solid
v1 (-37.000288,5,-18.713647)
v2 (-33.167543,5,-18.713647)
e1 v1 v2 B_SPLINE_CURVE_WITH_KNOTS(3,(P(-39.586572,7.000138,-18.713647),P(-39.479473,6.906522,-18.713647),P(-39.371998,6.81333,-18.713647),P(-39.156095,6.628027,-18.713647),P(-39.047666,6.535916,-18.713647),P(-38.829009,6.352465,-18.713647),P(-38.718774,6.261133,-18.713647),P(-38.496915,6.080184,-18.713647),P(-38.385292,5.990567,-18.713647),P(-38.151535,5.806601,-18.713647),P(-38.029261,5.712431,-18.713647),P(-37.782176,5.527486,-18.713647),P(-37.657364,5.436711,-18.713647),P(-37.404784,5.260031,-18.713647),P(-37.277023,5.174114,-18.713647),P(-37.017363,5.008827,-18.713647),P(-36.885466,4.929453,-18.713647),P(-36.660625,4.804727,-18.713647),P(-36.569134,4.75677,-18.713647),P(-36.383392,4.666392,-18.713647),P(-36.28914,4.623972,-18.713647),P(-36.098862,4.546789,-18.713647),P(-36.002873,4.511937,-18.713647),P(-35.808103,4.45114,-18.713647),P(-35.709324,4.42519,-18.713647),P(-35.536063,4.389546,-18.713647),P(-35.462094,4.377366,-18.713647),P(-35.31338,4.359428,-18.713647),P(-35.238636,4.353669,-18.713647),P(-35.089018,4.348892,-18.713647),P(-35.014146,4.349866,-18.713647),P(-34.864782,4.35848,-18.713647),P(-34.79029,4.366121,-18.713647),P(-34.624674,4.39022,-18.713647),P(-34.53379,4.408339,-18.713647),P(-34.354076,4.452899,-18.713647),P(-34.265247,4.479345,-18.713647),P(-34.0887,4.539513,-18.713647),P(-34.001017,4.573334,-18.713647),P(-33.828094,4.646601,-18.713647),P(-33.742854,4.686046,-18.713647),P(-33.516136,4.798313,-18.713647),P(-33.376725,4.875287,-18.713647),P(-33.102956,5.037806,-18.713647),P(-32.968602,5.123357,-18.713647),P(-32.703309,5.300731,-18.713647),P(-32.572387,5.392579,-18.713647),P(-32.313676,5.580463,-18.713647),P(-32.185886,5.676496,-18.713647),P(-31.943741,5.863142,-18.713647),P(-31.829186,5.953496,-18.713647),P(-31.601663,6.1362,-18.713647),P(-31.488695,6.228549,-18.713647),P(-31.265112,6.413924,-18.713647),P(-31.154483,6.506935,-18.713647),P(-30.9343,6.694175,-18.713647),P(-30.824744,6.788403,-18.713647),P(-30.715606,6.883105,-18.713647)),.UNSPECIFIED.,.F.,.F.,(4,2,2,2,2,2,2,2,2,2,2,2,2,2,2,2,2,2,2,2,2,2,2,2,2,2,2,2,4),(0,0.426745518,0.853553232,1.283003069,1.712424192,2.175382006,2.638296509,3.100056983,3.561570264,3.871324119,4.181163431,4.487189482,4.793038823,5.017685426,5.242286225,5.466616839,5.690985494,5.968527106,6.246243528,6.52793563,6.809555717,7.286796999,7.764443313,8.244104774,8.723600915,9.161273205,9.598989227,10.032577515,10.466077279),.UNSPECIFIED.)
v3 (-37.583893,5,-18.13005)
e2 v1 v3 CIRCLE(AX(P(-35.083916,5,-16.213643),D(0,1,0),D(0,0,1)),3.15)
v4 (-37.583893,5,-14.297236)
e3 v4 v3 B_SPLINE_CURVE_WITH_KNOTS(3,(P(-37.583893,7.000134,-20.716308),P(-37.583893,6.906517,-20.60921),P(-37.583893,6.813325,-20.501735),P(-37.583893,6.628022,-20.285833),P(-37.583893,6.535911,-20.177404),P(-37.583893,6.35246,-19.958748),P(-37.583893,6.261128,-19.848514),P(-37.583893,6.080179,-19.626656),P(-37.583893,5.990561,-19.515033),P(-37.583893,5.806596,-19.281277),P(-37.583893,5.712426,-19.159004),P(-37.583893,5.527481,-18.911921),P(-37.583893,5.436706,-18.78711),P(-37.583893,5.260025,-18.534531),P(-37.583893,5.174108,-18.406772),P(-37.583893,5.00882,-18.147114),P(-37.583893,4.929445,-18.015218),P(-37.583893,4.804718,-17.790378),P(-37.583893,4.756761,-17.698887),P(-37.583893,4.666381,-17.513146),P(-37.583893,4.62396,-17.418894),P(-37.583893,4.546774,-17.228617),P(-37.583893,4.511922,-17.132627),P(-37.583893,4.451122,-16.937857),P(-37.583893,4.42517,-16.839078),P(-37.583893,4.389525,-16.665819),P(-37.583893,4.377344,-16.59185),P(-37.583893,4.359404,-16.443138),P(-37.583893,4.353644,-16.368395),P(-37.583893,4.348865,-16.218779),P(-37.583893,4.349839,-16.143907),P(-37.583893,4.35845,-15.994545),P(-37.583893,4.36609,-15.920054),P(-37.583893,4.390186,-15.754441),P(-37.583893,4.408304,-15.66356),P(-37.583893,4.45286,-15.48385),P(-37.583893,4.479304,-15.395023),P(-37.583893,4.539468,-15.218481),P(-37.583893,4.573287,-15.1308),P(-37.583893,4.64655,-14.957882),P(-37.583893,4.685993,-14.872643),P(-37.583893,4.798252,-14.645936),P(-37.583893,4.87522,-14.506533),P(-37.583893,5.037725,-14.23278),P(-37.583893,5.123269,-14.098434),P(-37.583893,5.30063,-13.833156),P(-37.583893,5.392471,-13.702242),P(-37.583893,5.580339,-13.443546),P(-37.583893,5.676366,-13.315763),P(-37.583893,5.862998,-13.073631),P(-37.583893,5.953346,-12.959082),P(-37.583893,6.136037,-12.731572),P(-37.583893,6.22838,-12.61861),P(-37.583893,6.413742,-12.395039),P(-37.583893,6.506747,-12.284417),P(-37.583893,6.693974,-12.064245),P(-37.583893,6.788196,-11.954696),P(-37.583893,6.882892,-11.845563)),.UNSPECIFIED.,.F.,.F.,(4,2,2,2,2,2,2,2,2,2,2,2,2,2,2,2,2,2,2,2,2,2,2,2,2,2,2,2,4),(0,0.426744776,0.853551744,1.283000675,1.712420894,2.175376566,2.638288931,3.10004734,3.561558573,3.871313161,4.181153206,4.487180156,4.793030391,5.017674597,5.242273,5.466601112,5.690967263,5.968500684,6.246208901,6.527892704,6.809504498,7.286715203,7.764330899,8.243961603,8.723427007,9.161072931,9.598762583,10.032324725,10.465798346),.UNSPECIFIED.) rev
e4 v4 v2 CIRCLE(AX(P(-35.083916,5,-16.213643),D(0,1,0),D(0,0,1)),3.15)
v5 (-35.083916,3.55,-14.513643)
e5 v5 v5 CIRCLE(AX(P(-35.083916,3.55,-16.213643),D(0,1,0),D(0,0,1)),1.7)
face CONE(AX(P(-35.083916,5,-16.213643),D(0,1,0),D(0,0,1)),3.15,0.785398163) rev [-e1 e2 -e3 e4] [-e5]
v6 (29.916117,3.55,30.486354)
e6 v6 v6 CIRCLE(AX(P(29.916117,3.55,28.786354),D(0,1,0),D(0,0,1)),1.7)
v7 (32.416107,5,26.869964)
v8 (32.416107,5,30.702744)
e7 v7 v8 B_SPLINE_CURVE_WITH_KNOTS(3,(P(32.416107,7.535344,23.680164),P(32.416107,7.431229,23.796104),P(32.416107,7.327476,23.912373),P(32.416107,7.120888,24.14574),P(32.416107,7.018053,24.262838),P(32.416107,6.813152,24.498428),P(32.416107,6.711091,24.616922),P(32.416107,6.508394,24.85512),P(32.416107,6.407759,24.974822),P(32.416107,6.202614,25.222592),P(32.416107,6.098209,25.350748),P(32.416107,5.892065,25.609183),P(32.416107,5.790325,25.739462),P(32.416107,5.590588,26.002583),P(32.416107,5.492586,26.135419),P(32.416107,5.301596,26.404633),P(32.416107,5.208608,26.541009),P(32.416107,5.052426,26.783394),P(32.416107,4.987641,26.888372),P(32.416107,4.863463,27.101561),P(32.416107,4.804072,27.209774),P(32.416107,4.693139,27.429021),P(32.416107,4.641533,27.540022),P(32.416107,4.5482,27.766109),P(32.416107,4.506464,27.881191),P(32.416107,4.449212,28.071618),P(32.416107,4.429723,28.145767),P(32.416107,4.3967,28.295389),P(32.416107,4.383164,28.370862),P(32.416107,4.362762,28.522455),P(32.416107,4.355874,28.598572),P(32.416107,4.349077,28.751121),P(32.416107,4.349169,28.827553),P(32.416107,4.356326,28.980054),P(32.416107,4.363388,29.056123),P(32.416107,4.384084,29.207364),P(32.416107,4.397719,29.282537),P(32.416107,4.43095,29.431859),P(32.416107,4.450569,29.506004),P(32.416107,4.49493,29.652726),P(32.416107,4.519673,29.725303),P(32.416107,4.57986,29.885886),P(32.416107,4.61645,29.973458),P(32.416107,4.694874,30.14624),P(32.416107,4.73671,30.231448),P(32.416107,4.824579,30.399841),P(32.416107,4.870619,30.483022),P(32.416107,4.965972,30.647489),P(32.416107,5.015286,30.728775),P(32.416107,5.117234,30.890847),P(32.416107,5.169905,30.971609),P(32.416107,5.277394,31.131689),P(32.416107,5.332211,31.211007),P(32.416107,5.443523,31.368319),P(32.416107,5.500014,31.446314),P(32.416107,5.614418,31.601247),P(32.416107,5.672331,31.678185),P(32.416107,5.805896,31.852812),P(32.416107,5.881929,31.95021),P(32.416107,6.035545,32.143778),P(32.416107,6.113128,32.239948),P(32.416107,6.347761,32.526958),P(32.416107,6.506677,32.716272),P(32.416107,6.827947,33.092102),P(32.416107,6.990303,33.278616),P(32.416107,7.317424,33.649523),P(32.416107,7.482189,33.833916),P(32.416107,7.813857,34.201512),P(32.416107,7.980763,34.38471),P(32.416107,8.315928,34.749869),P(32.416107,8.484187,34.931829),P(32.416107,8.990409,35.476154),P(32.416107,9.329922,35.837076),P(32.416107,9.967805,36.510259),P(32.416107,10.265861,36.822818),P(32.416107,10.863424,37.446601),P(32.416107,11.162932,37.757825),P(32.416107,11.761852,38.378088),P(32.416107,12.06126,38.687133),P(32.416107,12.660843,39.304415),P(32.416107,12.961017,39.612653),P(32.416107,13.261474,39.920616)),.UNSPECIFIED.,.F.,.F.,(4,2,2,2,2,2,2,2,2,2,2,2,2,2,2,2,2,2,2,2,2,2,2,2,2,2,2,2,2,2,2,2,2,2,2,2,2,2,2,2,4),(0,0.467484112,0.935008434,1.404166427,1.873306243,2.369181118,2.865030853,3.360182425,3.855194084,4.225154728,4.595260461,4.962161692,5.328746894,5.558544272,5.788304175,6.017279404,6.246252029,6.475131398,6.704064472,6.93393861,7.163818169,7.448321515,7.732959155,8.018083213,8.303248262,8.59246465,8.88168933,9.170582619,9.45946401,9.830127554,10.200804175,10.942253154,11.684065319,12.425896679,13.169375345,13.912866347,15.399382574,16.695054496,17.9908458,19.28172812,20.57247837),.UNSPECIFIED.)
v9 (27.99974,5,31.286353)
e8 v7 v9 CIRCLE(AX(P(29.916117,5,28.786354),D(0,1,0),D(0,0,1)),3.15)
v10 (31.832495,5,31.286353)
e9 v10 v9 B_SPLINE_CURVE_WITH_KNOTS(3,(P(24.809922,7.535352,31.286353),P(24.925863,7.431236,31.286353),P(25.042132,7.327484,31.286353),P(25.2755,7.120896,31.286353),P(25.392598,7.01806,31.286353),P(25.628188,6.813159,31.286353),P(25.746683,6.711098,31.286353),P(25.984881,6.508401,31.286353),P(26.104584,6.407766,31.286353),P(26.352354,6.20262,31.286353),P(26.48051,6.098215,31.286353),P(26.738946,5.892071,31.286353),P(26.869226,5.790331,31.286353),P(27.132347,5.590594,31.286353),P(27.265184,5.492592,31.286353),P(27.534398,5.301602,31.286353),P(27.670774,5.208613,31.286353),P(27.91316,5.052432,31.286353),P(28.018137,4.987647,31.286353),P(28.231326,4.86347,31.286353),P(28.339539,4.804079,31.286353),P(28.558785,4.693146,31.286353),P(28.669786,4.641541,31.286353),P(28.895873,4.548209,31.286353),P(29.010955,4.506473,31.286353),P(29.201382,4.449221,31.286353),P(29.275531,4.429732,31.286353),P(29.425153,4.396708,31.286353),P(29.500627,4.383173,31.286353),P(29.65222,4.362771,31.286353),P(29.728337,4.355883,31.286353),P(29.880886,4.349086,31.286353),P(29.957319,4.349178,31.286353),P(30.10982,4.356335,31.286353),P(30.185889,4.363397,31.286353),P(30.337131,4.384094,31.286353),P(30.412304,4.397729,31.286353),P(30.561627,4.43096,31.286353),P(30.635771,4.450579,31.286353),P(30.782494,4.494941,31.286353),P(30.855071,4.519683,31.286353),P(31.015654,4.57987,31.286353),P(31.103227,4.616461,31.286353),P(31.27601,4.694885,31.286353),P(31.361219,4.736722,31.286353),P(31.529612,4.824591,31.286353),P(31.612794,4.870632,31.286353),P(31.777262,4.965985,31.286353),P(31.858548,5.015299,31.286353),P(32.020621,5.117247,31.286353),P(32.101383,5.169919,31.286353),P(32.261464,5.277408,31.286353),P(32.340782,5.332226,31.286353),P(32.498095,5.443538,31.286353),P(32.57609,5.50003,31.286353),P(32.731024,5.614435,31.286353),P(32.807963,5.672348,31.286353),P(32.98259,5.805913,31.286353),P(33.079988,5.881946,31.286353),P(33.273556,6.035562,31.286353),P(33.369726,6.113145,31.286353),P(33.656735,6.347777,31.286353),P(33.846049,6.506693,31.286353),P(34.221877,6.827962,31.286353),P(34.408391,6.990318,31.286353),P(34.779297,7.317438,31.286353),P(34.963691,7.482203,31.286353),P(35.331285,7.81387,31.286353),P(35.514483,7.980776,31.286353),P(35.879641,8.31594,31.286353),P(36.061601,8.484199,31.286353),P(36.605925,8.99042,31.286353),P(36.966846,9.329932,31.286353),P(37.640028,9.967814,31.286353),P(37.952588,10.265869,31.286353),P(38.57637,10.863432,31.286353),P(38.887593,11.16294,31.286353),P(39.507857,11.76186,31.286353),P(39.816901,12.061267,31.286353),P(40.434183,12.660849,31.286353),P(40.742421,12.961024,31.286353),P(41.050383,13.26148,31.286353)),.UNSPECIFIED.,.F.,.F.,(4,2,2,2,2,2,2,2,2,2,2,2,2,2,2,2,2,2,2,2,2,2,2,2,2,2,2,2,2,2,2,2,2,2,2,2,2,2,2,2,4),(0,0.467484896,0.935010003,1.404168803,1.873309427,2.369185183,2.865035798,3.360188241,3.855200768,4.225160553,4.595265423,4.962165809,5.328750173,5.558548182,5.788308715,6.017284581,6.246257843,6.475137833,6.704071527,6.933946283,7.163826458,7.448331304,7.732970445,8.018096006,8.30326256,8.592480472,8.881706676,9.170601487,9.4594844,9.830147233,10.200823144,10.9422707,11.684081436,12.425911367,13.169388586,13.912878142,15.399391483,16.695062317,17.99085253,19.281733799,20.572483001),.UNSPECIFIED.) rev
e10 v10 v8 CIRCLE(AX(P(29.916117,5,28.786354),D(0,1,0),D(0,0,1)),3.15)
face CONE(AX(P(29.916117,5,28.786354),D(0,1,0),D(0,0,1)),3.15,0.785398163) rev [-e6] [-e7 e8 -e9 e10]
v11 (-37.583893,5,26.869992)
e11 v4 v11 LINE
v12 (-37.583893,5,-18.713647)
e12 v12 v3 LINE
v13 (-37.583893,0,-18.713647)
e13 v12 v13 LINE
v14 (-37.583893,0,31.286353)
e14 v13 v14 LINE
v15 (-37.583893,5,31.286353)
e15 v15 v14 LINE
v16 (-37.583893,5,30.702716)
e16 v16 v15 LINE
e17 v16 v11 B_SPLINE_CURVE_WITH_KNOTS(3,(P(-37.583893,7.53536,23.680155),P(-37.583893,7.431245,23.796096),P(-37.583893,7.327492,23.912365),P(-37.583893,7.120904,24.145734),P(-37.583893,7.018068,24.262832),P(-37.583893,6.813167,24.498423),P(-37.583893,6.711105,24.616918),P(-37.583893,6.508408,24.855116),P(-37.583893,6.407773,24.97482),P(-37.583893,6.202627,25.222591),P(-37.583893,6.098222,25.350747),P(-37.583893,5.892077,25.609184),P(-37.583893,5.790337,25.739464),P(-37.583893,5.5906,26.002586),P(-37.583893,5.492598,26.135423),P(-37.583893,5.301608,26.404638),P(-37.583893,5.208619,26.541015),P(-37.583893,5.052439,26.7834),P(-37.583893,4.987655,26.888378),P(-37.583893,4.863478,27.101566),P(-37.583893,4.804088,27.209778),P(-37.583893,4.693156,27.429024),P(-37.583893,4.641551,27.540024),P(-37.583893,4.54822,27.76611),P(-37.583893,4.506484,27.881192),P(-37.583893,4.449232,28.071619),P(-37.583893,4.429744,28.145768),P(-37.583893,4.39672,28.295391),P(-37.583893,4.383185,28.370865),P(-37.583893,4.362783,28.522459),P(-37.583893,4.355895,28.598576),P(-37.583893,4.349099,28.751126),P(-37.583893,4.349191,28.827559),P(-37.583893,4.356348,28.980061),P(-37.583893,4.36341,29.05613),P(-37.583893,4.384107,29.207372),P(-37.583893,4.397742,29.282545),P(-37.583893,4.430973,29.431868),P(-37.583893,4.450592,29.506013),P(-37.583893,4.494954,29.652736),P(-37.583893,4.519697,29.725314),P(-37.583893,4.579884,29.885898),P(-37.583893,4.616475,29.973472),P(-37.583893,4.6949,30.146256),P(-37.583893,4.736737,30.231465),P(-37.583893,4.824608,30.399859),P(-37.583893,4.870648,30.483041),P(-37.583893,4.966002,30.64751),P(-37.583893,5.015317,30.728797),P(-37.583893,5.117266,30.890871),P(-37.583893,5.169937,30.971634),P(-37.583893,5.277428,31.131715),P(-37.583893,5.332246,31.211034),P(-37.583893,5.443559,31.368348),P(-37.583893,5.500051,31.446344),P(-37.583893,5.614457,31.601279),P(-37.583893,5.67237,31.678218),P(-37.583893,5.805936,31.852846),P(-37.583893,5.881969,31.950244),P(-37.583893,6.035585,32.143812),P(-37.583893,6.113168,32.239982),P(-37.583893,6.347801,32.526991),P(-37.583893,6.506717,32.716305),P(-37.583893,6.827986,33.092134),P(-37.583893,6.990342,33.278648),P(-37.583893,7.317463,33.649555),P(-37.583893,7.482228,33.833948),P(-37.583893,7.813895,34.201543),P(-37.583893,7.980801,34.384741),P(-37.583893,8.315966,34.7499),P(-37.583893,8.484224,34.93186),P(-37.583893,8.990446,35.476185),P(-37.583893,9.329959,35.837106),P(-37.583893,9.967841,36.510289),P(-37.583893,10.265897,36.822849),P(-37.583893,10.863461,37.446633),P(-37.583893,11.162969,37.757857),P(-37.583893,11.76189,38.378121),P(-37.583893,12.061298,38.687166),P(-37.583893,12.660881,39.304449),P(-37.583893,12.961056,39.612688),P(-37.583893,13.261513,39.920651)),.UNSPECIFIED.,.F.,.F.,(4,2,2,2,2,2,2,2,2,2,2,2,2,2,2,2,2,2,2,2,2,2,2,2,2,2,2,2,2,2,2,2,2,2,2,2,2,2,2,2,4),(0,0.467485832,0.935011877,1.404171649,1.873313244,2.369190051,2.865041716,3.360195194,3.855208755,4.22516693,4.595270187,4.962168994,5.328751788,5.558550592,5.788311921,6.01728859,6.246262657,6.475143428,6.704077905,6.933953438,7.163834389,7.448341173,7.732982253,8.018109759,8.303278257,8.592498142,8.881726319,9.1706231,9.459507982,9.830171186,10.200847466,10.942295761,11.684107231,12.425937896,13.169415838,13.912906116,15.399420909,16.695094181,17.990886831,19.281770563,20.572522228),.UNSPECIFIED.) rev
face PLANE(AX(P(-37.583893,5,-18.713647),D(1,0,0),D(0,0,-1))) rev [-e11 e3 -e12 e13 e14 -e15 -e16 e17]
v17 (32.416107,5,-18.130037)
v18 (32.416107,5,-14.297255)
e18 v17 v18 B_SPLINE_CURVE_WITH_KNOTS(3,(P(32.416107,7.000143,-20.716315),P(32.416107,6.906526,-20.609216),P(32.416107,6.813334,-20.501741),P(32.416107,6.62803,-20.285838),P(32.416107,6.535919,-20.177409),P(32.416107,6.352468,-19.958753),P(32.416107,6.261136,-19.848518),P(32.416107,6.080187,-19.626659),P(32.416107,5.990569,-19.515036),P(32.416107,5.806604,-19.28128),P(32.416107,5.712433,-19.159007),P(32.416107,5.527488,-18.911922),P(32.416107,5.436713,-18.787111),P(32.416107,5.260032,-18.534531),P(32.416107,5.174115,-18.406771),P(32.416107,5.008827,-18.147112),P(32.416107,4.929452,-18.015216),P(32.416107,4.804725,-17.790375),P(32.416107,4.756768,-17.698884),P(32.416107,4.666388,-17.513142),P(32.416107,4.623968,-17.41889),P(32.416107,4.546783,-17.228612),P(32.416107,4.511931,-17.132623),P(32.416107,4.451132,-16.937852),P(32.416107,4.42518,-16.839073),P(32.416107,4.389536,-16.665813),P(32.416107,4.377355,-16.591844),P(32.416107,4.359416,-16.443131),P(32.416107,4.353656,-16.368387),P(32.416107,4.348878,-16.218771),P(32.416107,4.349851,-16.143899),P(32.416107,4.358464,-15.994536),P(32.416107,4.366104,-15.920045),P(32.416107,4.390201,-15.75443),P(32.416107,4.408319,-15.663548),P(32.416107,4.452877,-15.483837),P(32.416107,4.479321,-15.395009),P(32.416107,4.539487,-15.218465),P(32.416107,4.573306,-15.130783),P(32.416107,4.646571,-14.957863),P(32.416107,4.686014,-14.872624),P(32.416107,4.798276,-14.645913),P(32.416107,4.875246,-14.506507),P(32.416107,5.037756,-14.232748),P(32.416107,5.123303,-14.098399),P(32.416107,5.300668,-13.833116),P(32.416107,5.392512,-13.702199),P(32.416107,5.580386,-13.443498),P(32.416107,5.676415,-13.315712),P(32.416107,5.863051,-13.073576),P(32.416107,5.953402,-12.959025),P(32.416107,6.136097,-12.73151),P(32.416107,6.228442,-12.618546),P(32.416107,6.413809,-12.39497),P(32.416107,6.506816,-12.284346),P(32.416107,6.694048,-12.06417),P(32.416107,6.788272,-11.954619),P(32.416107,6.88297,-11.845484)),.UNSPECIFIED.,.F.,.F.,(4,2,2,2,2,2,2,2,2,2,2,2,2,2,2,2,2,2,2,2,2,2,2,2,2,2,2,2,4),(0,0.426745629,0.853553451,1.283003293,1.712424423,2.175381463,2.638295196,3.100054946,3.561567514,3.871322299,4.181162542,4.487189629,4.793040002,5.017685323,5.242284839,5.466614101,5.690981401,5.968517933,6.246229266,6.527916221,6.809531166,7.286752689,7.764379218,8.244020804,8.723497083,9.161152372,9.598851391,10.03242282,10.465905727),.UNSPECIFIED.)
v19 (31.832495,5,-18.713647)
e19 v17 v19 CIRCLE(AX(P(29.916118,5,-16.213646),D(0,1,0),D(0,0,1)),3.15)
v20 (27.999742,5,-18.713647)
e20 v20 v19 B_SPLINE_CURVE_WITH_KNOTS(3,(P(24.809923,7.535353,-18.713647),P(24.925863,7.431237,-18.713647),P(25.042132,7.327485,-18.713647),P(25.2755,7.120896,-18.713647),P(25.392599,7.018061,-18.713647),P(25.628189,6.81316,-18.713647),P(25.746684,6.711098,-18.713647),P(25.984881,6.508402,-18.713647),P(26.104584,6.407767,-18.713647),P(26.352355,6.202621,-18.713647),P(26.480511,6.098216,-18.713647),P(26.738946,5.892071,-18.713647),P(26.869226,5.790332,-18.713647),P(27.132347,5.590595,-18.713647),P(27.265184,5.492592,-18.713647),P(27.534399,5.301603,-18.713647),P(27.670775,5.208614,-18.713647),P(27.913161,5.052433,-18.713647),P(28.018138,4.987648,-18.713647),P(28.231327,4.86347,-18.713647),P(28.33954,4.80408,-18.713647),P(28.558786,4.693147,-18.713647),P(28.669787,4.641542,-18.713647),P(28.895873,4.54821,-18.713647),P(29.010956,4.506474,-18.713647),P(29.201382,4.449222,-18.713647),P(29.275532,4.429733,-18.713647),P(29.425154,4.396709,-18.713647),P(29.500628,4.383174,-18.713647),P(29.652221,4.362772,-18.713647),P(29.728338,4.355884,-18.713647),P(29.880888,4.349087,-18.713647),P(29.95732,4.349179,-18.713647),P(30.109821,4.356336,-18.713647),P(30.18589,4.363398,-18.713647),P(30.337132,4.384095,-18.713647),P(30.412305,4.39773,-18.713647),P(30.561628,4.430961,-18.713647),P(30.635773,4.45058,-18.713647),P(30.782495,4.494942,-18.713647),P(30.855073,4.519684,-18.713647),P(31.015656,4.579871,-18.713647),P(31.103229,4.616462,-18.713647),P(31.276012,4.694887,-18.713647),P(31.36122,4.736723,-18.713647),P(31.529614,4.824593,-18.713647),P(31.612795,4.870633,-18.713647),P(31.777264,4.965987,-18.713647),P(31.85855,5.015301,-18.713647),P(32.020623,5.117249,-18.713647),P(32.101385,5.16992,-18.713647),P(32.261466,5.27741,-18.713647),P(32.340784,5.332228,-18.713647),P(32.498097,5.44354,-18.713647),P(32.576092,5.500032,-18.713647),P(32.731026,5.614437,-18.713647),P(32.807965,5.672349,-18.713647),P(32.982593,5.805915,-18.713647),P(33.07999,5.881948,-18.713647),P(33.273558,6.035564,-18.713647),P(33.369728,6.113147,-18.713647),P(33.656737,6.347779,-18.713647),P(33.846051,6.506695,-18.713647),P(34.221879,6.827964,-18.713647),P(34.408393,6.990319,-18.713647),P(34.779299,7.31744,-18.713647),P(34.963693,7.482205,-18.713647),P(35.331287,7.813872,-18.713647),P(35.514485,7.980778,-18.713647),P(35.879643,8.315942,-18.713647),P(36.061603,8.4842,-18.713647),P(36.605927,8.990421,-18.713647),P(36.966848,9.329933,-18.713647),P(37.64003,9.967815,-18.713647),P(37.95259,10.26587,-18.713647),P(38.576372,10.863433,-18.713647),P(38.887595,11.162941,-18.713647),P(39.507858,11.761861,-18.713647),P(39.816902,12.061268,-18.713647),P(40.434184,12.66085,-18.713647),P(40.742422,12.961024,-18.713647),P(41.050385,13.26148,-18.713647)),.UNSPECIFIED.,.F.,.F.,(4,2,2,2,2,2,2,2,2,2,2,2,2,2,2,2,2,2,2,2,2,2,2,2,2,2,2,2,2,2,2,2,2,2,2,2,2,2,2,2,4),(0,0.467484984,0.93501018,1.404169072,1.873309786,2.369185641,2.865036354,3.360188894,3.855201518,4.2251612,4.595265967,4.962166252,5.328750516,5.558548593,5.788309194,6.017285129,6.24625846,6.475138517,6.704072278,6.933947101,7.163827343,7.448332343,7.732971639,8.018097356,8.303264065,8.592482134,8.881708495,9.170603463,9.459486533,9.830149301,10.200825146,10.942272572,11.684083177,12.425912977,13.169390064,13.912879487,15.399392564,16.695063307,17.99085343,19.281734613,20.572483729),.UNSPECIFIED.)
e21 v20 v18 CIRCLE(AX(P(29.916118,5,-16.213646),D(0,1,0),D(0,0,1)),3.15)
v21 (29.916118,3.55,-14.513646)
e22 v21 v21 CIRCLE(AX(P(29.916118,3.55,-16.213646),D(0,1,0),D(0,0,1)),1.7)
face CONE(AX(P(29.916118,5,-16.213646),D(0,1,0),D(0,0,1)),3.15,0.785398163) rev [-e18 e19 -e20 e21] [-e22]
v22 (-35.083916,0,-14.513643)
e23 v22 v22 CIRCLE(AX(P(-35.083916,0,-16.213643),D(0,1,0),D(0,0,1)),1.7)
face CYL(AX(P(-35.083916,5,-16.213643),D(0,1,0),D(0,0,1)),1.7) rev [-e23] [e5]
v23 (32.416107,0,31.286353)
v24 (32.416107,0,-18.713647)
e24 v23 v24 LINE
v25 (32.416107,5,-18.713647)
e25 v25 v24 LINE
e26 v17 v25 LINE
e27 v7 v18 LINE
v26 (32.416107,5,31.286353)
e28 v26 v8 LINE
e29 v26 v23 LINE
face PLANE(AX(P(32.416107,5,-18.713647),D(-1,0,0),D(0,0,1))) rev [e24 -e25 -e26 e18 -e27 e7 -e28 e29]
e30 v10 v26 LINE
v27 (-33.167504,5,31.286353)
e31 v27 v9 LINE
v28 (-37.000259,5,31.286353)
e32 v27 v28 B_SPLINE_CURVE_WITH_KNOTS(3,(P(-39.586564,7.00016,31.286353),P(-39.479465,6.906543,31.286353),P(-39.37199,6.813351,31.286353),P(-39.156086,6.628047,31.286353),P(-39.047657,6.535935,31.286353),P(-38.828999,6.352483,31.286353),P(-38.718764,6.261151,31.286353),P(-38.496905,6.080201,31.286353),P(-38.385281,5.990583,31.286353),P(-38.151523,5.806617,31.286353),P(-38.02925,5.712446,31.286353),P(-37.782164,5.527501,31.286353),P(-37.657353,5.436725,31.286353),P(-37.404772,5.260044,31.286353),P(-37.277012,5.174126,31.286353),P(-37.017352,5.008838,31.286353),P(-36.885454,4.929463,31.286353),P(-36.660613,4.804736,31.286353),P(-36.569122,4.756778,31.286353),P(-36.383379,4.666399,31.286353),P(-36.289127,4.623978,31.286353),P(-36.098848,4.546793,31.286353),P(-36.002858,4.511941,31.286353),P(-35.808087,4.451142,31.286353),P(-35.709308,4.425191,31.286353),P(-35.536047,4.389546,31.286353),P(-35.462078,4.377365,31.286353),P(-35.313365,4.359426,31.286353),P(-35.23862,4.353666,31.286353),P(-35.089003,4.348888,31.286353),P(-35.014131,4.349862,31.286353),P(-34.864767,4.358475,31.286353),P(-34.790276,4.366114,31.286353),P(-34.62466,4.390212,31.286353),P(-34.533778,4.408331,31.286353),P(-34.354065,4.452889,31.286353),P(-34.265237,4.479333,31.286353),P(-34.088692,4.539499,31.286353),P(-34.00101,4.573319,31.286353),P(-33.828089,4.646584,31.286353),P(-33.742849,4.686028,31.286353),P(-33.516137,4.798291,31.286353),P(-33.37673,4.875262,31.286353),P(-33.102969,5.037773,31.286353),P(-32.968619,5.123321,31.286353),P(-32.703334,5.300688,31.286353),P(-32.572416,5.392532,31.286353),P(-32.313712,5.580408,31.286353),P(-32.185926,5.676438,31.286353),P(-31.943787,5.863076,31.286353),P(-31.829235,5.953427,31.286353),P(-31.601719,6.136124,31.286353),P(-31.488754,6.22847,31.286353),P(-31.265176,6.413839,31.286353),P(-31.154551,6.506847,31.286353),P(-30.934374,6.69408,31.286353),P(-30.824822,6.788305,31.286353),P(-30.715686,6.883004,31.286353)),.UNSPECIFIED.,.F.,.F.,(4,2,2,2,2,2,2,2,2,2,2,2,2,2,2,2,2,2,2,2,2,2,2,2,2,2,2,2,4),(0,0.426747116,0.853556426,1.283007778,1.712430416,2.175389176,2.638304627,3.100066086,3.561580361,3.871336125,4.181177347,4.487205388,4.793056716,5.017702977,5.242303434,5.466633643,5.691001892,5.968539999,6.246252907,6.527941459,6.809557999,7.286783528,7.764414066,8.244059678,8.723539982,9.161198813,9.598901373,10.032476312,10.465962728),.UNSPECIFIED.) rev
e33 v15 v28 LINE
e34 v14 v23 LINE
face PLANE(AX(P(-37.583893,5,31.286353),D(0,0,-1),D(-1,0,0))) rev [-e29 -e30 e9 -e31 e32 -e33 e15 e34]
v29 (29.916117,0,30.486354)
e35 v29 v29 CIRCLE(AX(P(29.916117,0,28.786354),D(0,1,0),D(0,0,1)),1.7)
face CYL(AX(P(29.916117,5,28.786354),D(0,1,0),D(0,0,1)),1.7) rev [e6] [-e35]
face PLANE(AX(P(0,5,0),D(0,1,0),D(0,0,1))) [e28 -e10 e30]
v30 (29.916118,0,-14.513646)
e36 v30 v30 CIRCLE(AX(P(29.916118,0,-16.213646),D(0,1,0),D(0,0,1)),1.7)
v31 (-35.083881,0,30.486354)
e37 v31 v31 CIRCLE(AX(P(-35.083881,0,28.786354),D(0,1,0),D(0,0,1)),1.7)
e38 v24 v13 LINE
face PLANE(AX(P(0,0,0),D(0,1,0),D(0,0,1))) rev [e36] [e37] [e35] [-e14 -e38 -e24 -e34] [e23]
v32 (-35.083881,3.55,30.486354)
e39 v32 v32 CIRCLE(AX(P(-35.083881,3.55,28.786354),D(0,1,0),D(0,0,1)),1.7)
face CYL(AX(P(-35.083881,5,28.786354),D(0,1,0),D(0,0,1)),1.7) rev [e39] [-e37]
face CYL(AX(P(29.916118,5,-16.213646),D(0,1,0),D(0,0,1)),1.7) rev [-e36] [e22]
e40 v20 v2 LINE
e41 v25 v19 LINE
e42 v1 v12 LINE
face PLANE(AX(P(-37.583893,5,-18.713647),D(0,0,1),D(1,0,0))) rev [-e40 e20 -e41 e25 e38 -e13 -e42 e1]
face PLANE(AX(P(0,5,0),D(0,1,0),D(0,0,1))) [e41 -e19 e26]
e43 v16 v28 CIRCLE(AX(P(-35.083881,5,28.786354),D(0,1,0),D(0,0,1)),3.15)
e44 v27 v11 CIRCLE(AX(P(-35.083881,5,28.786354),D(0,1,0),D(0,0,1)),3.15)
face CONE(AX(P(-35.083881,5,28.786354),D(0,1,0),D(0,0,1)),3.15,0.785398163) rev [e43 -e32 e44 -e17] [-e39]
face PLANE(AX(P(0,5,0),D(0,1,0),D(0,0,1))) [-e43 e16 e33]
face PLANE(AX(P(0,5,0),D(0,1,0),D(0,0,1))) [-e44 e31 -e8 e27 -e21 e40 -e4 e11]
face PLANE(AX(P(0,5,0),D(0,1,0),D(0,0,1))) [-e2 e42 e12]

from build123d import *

# Parameters (mm, degrees)
CROQUIS1_W              = 70
CROQUIS1_H              = 50
SALIENTE_EXTRUIR1_DEPTH = 5


# Read off the part's stored shape, not the designer's step: Avellanado para tornillo con cabeza plana avellanada de M31
with BuildPart() as part:
    # Croquis1 → Saliente-Extruir1 (new body)
    with BuildSketch(Plane(origin=(0, 0, 0), x_dir=(1, 0, 0), z_dir=(0, 1, 0))):
        with Locations((-2.583892617, -6.286353468)):
            Rectangle(CROQUIS1_W, CROQUIS1_H)
    extrude(amount=SALIENTE_EXTRUIR1_DEPTH)

    # Avellanado para tornillo con cabeza  2 → Avellanado para tornillo con cabeza plana avellanada de M31 (revolve, cut)
    with BuildSketch(Plane(origin=(-35.083881152, 0, 28.786353921), x_dir=(1, 0, 0), z_dir=(0, 0, 1))):
        Polygon((3.15, 5), (0, 5), (0, 0), (1.7, 0), (1.7, 3.55), align=None)
    revolve(axis=Axis((-35.083881152, 0, 28.786353921), (0, 1, 0)), mode=Mode.SUBTRACT)

    # Avellanado para tornillo con cabeza 3 ou → Avellanado para tornillo con cabeza  3 (revolve, cut)
    with BuildSketch(Plane(origin=(29.916117476, 0, 28.786354313), x_dir=(1, 0, 0), z_dir=(0, 0, 1))):
        Polygon((3.15, 5), (0, 5), (0, 0), (1.7, 0), (1.7, 3.55), align=None)
    revolve(axis=Axis((29.916117476, 0, 28.786354313), (0, 1, 0)), mode=Mode.SUBTRACT)

    # Avellanado para tornillo con cabeza 4 ou → Avellanado para tornillo con cabeza  4 (revolve, cut)
    with BuildSketch(Plane(origin=(29.916118299, 0, -16.213646367), x_dir=(1, 0, 0), z_dir=(0, 0, 1))):
        Polygon((3.15, 5), (0, 5), (0, 0), (1.7, 0), (1.7, 3.55), align=None)
    revolve(axis=Axis((29.916118299, 0, -16.213646367), (0, 1, 0)), mode=Mode.SUBTRACT)

    # Avellanado para tornillo con cabeza 5 ou → Avellanado para tornillo con cabeza  5 (revolve, cut)
    with BuildSketch(Plane(origin=(-35.083915903, 0, -16.21364324), x_dir=(1, 0, 0), z_dir=(0, 0, 1))):
        Polygon((3.15, 5), (0, 5), (0, 0), (1.7, 0), (1.7, 3.55), align=None)
    revolve(axis=Axis((-35.083915903, 0, -16.21364324), (0, 1, 0)), mode=Mode.SUBTRACT)


solid = part.part
